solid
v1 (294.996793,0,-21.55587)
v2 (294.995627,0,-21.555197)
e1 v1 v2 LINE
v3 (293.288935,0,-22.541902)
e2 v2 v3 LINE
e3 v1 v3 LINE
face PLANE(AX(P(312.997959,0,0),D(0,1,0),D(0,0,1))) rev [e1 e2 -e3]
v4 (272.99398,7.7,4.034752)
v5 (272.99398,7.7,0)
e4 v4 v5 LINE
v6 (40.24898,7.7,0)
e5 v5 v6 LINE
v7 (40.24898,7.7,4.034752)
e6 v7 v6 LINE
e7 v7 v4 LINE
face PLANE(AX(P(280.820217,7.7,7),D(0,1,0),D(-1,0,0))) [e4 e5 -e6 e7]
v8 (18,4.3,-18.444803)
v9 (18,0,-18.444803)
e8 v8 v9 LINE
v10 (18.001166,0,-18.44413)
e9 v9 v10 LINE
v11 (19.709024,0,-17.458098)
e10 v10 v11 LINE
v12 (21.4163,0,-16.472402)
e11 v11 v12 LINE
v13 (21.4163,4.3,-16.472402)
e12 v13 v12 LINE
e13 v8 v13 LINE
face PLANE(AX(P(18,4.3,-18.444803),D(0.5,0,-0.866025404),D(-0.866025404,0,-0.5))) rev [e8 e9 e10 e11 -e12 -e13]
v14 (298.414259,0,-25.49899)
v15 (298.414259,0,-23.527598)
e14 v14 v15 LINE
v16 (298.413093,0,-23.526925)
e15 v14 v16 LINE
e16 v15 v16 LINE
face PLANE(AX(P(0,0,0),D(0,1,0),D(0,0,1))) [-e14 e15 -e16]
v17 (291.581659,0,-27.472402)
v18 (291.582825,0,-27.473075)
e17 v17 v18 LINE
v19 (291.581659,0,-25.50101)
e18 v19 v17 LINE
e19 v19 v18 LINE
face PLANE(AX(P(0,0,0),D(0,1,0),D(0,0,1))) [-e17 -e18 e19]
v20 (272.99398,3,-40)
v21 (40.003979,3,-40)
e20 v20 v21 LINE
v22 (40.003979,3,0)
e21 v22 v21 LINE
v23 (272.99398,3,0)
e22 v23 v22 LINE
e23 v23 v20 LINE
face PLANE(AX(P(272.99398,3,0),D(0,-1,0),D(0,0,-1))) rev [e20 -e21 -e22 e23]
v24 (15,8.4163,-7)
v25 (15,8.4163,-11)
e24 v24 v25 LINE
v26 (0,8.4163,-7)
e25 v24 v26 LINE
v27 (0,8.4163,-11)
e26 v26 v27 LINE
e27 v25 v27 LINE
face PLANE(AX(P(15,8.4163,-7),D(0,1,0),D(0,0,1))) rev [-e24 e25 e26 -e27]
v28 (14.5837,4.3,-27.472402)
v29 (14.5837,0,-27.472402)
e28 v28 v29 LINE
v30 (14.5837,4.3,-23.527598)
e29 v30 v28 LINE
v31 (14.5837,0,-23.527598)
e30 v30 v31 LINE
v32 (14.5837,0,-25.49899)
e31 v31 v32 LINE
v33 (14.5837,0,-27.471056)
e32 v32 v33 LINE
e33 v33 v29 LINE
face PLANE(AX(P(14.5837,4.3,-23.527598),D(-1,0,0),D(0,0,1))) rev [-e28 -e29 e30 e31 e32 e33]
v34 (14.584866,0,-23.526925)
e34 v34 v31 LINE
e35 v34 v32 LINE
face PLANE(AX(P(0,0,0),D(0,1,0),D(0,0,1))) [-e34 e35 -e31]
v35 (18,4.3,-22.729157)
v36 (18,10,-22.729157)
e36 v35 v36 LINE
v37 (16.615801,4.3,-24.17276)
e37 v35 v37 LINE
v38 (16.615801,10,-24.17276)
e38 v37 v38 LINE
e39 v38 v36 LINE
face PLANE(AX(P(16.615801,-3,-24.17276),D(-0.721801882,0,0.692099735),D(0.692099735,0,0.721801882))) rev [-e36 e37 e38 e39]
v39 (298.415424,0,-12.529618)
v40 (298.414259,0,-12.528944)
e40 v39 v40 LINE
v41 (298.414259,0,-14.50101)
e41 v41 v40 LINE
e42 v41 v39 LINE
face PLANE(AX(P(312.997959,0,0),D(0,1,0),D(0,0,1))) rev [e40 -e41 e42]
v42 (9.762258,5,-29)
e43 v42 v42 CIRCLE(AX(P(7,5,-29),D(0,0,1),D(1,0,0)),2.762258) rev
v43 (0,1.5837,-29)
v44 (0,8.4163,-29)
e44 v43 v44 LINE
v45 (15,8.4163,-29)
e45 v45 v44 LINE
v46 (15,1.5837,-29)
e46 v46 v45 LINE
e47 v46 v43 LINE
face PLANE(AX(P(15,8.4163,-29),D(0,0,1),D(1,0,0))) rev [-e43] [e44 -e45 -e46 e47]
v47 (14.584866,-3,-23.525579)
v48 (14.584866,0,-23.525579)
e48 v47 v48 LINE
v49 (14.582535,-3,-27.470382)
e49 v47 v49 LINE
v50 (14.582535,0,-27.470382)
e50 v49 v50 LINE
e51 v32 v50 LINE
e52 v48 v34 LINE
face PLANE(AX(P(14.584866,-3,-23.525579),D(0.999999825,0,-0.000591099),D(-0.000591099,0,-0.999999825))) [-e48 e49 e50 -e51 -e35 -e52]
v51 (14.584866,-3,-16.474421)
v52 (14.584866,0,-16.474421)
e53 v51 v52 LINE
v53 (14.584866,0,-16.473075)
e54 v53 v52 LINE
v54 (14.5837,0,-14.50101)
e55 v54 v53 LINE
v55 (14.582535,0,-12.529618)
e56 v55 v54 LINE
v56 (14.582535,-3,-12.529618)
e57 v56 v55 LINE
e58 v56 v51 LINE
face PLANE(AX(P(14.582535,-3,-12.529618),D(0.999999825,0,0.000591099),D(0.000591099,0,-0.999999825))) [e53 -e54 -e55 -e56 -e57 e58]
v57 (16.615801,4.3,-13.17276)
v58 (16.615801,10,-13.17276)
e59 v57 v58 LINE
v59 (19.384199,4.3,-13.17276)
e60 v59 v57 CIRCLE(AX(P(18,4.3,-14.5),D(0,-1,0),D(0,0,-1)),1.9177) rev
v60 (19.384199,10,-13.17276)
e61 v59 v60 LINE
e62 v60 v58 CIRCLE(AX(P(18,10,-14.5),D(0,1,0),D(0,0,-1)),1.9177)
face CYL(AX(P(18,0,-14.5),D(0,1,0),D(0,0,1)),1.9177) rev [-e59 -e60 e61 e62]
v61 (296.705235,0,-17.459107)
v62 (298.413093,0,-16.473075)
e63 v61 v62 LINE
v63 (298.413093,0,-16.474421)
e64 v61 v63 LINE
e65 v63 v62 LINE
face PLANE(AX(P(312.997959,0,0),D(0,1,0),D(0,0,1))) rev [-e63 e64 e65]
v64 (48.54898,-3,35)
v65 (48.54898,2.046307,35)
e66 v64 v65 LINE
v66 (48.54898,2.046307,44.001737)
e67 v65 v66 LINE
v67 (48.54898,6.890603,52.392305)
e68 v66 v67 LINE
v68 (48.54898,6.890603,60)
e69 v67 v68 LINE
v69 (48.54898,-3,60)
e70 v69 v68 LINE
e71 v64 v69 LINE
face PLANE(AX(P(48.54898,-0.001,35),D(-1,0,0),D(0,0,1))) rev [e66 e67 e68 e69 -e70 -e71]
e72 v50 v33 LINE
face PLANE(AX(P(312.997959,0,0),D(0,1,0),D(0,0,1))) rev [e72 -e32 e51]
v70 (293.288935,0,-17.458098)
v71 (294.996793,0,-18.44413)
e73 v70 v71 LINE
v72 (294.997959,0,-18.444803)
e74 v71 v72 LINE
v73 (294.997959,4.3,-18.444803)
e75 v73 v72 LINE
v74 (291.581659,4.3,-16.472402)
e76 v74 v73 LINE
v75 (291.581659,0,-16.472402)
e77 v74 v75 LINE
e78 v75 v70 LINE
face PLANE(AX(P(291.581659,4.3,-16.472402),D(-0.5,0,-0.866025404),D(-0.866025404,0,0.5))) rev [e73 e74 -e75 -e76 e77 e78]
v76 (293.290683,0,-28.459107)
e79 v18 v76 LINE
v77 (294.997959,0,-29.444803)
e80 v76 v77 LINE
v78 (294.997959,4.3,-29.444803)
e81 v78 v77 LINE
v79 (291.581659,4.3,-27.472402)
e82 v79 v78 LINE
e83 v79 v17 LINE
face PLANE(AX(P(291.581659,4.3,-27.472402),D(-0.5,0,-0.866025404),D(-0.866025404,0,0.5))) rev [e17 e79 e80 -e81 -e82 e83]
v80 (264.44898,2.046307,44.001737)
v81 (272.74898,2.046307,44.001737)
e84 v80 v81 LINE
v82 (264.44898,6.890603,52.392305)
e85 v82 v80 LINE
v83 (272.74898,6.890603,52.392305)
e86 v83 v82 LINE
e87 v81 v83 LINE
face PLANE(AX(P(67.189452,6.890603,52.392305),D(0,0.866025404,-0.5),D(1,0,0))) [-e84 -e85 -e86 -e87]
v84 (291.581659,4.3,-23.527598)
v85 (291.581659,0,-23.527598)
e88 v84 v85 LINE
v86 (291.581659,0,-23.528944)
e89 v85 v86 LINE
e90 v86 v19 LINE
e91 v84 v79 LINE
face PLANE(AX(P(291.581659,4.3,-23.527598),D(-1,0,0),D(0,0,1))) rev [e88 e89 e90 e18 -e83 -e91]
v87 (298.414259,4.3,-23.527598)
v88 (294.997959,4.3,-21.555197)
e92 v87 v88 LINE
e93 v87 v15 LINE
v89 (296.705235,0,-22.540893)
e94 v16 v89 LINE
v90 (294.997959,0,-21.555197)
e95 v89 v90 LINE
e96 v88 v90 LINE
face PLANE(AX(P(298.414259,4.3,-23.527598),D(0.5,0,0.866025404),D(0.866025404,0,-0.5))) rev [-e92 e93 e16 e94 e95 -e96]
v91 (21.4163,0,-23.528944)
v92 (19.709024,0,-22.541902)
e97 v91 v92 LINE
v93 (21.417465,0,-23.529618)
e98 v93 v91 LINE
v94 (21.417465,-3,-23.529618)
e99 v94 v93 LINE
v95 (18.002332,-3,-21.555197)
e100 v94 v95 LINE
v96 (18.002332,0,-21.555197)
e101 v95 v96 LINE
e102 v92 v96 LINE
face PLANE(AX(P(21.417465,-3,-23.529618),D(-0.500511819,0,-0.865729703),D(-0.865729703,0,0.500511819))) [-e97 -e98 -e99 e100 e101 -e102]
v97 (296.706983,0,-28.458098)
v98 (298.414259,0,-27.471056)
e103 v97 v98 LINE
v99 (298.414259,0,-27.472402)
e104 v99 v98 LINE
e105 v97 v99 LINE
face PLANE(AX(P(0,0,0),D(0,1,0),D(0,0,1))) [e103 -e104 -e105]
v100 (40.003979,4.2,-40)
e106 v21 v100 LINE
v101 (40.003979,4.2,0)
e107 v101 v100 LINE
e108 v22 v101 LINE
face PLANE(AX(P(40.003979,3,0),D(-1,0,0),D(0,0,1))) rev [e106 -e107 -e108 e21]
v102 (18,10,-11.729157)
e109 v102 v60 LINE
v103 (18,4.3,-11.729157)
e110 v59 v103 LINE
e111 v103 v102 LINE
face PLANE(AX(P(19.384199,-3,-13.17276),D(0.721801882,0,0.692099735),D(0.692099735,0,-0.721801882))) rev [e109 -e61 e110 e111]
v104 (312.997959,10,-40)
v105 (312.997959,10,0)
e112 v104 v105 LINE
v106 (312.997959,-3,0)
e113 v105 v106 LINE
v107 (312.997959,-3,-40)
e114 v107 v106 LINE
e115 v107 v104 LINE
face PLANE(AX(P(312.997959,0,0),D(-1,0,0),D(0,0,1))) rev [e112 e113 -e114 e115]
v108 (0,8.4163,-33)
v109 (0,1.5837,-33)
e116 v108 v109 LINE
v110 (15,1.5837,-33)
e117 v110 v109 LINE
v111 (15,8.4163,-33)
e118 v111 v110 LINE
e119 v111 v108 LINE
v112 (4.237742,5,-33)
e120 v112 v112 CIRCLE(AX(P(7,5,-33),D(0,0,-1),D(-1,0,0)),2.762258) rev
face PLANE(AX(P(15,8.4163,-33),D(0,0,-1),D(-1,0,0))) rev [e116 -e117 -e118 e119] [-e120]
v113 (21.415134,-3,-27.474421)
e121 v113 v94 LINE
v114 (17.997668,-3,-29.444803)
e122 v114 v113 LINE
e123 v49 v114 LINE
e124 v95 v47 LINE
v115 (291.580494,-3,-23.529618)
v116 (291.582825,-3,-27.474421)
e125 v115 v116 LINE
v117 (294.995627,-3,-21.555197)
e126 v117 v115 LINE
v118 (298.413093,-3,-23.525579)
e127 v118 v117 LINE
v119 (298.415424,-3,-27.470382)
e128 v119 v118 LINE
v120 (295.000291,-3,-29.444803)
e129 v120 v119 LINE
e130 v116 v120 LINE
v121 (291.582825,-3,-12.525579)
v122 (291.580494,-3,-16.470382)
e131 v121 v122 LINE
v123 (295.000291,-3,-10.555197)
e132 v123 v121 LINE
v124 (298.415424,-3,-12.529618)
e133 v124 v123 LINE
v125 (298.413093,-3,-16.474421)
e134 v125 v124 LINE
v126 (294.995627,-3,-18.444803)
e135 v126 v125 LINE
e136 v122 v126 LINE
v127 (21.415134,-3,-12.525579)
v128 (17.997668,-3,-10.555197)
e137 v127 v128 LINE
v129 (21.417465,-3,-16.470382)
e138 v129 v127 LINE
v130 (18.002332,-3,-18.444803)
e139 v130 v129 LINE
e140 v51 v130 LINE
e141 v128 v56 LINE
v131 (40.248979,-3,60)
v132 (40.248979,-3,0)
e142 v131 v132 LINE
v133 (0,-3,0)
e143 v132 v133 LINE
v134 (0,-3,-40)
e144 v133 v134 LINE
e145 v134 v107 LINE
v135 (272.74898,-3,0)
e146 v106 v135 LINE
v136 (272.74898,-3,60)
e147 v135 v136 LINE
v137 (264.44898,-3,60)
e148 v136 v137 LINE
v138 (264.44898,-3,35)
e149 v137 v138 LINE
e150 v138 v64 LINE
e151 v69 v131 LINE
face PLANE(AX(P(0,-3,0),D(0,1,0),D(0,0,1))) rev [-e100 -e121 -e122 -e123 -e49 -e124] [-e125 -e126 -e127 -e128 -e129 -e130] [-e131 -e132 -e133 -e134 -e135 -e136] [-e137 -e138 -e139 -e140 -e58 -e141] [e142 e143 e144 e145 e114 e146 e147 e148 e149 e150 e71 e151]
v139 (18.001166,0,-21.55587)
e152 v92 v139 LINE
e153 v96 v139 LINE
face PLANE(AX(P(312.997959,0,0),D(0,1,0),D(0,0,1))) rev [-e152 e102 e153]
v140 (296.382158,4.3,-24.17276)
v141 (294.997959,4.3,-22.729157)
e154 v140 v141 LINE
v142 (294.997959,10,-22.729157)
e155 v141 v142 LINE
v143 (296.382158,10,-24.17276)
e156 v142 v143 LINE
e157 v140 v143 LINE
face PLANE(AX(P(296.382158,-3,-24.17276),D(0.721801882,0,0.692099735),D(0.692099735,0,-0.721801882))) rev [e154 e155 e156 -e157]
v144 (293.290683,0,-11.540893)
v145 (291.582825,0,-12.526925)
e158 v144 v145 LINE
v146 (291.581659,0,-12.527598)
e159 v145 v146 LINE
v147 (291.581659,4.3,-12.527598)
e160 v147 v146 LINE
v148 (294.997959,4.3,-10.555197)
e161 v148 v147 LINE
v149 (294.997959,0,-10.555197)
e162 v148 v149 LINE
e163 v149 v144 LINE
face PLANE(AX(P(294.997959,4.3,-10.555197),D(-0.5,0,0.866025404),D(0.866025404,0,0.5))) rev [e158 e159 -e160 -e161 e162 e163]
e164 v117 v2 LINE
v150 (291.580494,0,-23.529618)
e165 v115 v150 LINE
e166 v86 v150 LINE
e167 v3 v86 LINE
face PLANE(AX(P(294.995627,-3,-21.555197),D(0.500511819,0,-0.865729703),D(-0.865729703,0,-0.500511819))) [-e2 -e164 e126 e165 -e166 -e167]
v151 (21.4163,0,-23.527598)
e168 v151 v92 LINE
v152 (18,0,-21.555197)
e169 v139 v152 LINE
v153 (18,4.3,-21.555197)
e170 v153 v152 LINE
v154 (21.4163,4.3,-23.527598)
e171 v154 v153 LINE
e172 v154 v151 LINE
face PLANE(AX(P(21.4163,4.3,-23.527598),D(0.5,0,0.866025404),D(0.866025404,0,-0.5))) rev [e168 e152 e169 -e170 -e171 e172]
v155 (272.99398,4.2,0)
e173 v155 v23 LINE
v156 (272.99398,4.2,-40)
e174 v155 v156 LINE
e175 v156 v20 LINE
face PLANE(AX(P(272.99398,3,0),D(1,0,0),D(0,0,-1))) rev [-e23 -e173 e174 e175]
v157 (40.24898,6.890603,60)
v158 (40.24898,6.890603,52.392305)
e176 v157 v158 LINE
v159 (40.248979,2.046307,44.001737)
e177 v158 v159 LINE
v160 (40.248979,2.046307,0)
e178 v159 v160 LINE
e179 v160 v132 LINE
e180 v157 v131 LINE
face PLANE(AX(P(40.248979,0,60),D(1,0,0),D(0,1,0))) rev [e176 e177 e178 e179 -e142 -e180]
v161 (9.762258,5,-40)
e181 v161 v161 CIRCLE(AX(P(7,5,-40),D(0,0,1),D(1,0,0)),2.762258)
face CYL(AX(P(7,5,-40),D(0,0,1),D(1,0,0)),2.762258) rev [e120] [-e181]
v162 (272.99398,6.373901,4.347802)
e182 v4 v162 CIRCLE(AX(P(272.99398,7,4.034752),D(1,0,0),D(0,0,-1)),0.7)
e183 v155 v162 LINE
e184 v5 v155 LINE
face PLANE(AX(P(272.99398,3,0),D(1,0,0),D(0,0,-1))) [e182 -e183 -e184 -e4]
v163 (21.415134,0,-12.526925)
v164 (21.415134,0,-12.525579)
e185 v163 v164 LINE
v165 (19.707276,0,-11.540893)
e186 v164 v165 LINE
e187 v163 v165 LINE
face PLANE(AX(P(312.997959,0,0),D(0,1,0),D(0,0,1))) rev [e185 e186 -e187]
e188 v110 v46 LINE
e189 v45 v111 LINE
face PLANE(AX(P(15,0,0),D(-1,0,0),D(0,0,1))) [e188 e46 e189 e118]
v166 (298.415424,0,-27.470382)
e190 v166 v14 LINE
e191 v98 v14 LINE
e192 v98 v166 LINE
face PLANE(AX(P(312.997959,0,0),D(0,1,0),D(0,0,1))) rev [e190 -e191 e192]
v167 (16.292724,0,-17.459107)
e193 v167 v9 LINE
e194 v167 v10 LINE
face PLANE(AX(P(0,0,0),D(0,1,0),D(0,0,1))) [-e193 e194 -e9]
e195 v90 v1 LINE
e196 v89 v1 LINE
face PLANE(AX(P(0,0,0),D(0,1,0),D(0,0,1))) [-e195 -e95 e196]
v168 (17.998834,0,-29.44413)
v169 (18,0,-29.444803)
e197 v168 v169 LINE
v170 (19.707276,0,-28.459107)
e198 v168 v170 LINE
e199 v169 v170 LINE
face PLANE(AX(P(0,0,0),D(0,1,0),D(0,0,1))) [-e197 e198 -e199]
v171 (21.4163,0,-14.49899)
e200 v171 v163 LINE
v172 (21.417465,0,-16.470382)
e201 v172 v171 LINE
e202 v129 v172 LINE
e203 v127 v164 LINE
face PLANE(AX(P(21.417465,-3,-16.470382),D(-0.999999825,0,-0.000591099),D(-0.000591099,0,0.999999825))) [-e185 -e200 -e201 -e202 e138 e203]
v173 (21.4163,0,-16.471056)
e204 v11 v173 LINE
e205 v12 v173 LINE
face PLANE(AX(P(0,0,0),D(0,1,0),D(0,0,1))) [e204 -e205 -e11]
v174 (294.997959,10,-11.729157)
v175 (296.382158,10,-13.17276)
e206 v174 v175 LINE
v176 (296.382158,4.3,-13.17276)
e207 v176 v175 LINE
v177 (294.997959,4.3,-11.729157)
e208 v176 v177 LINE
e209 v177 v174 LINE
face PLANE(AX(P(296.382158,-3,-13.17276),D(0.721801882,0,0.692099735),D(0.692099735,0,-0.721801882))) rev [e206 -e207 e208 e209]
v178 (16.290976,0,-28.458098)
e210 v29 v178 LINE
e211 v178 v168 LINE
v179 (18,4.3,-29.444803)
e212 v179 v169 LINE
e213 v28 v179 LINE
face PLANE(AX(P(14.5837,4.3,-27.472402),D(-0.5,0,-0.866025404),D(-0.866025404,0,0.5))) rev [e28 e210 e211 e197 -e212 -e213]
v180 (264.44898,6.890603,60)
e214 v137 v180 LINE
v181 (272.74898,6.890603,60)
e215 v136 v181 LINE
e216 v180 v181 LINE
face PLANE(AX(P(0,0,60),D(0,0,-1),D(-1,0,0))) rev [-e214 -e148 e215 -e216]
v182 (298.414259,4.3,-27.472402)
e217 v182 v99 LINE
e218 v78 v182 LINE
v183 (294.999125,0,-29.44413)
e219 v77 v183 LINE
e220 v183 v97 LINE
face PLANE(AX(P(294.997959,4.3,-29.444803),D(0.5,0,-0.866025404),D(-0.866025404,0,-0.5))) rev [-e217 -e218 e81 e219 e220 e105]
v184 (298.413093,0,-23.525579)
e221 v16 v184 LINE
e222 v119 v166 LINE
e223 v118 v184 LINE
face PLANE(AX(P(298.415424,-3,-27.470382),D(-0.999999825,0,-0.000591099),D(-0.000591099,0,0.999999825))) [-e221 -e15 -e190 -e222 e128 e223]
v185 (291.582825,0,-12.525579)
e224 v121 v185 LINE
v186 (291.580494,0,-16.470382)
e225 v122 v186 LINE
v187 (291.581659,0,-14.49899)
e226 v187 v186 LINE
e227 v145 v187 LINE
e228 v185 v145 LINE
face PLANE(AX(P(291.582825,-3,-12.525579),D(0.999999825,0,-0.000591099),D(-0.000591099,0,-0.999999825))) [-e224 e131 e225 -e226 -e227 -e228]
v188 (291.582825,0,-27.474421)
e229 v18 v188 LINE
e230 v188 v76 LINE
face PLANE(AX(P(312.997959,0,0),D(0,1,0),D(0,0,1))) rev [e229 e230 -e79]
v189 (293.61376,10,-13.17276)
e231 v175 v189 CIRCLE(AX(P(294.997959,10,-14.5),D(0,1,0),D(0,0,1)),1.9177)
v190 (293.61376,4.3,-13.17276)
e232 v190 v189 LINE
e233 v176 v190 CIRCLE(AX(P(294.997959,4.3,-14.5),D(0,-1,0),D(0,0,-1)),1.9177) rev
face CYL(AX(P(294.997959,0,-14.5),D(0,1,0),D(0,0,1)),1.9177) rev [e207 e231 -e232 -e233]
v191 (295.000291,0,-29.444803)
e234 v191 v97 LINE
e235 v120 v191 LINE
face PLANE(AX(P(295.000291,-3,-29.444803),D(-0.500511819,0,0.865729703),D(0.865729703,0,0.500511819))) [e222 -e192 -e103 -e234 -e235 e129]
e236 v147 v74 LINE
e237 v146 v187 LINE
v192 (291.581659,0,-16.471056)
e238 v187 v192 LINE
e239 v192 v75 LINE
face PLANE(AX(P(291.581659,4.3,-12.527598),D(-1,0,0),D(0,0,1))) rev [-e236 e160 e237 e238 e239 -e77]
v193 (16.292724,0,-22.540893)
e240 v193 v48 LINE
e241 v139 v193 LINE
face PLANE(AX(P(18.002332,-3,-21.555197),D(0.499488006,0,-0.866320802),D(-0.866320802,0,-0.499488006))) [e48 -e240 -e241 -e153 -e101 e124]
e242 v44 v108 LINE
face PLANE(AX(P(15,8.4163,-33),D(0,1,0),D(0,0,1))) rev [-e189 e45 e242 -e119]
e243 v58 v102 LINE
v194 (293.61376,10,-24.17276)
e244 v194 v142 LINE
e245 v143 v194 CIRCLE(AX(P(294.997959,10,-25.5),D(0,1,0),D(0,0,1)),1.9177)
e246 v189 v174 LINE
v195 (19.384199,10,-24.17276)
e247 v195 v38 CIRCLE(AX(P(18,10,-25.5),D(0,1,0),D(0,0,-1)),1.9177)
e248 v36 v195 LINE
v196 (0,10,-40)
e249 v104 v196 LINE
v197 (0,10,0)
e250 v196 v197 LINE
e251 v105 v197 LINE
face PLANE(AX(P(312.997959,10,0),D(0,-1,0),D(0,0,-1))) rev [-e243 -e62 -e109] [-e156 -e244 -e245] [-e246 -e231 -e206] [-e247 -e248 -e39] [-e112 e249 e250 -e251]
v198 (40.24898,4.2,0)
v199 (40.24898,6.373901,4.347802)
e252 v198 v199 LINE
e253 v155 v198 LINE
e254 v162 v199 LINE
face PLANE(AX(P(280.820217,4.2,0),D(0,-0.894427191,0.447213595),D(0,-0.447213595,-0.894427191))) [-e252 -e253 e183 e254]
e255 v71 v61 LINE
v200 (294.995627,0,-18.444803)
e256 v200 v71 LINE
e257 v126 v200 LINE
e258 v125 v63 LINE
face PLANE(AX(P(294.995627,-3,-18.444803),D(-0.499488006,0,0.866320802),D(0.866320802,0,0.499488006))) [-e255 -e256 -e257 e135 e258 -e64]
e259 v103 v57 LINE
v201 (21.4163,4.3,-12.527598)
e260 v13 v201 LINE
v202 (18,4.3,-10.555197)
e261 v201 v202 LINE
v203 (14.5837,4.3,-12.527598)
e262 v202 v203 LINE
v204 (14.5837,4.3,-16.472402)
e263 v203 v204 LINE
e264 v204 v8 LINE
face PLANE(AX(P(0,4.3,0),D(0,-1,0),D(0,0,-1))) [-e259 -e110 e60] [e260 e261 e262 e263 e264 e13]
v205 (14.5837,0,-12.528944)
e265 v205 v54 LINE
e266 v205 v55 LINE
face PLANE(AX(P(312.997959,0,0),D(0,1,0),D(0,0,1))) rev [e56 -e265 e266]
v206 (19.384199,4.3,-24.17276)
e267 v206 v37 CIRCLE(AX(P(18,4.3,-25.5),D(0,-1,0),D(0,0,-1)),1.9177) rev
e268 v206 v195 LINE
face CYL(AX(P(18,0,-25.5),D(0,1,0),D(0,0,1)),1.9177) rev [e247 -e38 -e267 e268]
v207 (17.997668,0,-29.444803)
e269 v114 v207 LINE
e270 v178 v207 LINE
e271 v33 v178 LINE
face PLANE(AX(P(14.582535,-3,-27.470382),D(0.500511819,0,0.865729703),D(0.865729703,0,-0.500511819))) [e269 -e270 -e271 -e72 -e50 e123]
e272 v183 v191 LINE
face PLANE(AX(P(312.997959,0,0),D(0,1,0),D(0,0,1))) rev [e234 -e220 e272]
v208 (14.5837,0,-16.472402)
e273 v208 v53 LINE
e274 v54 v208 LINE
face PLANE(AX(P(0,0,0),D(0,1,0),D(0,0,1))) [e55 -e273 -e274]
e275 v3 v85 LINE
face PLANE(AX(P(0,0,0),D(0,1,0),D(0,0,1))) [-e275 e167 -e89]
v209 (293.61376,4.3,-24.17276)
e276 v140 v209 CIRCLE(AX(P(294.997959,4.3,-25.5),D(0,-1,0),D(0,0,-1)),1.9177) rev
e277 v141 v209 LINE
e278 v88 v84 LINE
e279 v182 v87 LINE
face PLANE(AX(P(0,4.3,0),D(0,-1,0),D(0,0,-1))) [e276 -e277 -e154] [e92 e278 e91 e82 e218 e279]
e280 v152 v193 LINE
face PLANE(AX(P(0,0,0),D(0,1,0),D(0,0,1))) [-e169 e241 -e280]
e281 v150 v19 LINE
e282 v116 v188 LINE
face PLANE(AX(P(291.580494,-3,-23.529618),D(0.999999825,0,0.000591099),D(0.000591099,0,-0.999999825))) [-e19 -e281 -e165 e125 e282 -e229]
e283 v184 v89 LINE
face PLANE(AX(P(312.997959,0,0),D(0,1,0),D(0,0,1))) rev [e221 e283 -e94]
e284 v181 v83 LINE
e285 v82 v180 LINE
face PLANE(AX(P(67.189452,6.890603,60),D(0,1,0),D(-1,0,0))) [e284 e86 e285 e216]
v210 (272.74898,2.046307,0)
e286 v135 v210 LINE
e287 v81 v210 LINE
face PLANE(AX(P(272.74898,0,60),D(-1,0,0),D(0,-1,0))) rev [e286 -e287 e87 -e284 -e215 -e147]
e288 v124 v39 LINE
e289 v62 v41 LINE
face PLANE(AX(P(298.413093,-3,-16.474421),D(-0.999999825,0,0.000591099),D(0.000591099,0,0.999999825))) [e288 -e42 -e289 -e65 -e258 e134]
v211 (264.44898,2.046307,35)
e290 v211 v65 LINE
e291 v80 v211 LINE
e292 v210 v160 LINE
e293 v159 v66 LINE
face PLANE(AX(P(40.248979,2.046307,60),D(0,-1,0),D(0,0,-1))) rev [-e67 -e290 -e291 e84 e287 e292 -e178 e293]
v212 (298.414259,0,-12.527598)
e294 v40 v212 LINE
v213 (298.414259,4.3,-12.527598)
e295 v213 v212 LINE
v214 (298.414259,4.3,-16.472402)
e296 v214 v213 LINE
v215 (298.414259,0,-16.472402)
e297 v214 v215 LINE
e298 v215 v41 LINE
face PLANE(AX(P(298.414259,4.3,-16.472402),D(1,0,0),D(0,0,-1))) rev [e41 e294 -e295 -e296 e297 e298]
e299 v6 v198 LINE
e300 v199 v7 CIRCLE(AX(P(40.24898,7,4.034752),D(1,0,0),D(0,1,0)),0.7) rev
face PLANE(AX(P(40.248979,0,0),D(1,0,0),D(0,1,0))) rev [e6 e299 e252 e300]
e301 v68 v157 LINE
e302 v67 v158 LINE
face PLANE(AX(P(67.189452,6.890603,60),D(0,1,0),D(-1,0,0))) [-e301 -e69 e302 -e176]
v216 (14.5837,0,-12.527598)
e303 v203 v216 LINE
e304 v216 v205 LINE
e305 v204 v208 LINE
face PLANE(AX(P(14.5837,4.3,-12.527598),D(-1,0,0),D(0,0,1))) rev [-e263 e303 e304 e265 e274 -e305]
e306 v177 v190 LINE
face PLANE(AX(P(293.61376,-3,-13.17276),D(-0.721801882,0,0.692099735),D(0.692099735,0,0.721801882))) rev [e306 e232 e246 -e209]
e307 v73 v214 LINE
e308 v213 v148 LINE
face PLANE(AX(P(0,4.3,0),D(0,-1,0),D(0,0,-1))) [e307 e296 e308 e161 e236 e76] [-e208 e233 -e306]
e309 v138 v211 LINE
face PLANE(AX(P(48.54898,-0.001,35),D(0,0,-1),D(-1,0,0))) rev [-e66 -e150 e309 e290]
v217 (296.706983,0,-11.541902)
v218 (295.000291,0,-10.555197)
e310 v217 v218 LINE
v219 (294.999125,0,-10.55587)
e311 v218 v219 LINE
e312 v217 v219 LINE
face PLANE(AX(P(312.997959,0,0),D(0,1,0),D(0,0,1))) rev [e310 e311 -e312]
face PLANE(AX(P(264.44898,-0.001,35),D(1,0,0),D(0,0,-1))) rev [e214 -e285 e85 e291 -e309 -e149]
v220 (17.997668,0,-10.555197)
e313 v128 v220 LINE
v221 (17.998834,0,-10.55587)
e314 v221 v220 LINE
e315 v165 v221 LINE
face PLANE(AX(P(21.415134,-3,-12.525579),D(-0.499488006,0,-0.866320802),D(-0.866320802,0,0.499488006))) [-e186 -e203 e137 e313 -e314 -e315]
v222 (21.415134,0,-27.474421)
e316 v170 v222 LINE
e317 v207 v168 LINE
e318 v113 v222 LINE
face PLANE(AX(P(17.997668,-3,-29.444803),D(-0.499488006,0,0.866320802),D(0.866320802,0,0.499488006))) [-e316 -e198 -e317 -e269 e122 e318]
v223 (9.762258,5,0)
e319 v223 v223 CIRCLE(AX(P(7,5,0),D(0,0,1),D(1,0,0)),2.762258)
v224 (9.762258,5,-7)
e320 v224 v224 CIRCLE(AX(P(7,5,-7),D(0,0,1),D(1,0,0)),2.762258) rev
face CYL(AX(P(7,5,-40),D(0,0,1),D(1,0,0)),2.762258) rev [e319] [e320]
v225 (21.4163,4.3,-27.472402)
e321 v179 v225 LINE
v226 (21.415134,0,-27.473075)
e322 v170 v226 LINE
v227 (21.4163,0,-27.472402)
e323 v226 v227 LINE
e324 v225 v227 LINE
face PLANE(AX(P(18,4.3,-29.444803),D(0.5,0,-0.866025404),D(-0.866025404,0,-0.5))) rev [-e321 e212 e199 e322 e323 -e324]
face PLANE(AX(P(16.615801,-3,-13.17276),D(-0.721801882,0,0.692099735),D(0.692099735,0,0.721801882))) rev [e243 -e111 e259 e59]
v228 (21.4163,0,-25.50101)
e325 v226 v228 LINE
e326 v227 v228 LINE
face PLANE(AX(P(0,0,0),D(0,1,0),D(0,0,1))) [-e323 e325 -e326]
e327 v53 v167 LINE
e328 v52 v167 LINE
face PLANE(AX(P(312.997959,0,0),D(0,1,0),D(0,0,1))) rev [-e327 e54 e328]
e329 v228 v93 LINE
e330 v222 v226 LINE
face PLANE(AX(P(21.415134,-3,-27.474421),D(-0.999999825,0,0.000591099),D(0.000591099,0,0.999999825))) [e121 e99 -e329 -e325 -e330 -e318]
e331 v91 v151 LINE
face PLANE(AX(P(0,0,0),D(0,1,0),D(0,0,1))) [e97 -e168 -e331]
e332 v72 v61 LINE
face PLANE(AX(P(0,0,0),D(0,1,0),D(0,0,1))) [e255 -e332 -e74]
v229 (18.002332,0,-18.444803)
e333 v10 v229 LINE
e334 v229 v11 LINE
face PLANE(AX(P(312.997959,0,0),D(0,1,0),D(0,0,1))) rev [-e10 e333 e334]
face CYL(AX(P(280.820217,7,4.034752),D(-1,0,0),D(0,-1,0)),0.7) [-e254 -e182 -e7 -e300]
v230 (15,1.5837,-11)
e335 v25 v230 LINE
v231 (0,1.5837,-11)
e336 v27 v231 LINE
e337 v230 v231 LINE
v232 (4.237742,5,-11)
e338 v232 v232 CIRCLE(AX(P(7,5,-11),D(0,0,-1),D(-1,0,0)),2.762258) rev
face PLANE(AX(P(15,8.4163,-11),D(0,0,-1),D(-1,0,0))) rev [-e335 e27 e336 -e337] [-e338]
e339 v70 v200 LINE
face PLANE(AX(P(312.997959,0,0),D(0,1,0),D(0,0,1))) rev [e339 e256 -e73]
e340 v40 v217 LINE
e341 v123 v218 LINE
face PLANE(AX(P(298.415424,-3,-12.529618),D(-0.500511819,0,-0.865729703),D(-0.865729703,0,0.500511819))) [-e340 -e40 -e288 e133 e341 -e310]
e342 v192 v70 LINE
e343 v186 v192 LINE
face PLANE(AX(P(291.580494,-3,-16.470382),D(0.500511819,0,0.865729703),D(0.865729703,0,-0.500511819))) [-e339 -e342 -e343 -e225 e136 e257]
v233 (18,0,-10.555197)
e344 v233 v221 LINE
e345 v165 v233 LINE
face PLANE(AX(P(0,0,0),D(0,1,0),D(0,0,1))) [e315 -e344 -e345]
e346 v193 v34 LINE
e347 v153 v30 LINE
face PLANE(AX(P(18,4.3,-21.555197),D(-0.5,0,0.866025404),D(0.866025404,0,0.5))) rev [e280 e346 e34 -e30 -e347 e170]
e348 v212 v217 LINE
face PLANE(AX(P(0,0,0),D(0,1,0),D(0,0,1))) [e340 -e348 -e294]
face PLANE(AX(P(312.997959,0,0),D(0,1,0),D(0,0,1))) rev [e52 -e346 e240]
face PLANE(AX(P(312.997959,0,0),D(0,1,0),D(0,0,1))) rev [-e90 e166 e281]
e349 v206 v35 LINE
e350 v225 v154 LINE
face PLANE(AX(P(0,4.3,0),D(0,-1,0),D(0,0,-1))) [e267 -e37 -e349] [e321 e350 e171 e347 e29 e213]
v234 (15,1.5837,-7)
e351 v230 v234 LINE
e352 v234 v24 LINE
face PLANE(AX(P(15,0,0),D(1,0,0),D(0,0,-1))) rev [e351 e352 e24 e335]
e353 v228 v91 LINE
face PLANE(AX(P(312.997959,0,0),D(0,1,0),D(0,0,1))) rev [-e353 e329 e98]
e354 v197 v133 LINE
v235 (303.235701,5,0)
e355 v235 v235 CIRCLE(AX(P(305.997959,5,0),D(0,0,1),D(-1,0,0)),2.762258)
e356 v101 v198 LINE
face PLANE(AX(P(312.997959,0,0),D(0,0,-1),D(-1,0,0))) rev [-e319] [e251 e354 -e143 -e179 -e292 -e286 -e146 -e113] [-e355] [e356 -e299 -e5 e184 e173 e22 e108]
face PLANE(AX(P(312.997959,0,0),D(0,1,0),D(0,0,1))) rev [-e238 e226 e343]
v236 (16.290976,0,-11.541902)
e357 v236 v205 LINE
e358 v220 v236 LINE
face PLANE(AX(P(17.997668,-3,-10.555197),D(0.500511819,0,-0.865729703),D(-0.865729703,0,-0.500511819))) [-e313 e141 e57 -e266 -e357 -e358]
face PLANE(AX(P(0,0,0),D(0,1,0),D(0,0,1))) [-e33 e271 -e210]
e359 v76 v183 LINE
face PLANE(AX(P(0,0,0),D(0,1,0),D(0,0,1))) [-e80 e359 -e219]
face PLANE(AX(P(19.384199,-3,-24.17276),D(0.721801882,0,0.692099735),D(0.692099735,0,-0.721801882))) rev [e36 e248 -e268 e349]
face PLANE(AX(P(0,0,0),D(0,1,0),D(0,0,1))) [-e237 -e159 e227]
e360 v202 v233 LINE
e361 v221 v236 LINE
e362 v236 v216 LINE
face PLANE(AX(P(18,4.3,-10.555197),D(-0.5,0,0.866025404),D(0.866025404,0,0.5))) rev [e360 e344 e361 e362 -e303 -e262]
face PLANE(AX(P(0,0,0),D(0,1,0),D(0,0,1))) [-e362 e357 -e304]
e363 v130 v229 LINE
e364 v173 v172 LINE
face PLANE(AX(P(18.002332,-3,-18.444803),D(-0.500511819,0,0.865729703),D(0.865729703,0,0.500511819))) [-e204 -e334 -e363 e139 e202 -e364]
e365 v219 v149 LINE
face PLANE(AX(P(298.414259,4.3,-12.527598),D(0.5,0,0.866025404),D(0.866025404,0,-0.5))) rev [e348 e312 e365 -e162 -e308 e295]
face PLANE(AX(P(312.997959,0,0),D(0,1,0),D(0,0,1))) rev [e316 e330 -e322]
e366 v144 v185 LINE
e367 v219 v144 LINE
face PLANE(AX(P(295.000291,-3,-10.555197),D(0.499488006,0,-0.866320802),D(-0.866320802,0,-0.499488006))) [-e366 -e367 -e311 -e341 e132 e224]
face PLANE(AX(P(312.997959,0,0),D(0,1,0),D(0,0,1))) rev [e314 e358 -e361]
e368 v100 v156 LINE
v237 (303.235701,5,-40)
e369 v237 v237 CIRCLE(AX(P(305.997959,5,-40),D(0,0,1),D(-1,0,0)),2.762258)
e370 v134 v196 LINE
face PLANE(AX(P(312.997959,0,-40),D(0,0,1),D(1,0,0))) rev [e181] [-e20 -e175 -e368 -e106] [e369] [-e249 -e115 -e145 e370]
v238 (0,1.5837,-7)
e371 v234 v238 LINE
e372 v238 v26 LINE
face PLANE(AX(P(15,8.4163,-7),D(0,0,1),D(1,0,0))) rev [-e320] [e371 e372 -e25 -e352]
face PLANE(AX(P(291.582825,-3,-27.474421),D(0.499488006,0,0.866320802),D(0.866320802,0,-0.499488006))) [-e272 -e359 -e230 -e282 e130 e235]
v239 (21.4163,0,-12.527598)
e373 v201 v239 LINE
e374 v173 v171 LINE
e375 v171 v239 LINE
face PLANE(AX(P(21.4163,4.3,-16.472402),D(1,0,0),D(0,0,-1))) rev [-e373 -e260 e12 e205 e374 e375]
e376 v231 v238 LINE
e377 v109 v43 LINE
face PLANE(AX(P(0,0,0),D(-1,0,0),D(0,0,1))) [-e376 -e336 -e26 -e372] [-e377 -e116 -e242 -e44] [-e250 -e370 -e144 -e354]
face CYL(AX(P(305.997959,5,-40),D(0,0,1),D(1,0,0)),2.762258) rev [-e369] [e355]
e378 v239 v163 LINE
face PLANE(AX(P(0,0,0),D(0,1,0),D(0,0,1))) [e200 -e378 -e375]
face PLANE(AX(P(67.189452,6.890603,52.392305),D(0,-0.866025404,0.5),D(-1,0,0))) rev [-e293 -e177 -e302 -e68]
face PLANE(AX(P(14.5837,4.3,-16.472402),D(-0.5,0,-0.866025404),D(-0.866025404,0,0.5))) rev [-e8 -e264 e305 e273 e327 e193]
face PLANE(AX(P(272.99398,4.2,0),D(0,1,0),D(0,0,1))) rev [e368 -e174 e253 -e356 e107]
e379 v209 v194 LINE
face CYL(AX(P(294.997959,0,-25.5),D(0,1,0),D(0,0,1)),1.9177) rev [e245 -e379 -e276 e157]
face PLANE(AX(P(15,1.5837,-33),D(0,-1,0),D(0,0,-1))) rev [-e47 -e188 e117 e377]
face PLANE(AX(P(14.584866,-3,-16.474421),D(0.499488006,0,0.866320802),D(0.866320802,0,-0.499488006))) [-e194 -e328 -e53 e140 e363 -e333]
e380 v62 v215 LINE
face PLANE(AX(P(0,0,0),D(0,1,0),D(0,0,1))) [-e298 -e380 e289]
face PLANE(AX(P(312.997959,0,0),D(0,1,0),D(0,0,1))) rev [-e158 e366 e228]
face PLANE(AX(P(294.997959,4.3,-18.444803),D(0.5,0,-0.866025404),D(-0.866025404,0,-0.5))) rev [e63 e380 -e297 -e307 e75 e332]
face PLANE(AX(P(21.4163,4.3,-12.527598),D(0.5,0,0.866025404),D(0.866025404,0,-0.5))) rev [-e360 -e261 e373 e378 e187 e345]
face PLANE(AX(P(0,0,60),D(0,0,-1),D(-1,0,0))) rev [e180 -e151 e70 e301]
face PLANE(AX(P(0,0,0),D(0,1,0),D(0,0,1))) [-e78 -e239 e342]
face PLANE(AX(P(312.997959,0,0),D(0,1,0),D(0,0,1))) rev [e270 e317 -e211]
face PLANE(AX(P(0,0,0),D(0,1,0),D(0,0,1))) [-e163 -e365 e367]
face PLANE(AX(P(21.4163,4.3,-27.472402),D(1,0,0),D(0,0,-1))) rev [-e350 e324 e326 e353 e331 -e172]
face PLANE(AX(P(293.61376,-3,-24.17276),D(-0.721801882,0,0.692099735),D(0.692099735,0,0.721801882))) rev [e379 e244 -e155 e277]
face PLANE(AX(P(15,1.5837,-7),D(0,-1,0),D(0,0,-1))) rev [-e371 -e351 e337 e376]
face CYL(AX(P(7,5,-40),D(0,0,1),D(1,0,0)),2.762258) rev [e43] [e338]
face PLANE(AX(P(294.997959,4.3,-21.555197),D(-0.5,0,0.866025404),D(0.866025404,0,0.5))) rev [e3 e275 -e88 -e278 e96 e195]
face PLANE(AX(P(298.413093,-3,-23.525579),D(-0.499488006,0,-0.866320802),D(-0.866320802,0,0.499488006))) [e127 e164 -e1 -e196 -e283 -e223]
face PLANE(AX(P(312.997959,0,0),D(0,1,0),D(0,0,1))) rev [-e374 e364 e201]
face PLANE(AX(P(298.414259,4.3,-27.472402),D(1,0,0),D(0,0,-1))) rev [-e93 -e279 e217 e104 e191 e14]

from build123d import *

# Parameters (mm, degrees)
SKETCH1_W           = 40
SKETCH1_H           = 10
BOSS_EXTRUDE1_DEPTH = 312.997959
SKETCH2_W           = 232.99
SKETCH2_H           = 1.2
CUT_EXTRUDE1_DEPTH  = 316.701951749
SKETCH3_R           = 1.9177
CUT_EXTRUDE2_DEPTH  = 316.701951749
CUT_EXTRUDE3_DEPTH  = 4.3
SKETCH5_R           = 2.762258299
CUT_EXTRUDE4_DEPTH  = 316.701951749
SKETCH6_W           = 4
SKETCH6_H           = 6.8326
CUT_EXTRUDE5_DEPTH  = 15
SKETCH7_W           = 232.5
SKETCH7_H           = 2.046306953
BOSS_EXTRUDE2_DEPTH = 60
CUT_EXTRUDE6_REACH  = 320.796
SKETCH8_W           = 215.9
SKETCH8_H           = 25
BOSS_EXTRUDE3_DEPTH = 3
SKETCH10_W          = 18
SKETCH10_H          = 4.844296322
BOSS_EXTRUDE4_DEPTH = 8.3
BOSS_EXTRUDE6_DEPTH = 232.745
FILLET1_R           = 0.7
SKETCH15_W          = 8.3
SKETCH15_H          = 18
BOSS_EXTRUDE8_DEPTH = 4.844296322
CUT_EXTRUDE8_DEPTH  = 319.961944969
CHAMFER1_SIZE       = 10.392304845
CHAMFER1_SIZE_2     = 6


with BuildPart() as part:
    # Sketch1 → Boss-Extrude1 (new body)
    with BuildSketch(Plane(origin=(0, 0, 0), x_dir=(0, 0, -1), z_dir=(1, 0, 0))):
        with Locations((20, 5)):
            Rectangle(SKETCH1_W, SKETCH1_H)
    extrude(amount=BOSS_EXTRUDE1_DEPTH)

    # Sketch2 → Cut-Extrude1 (cut, through all)
    with BuildSketch(Plane(origin=(0, 0, -40), x_dir=(-1, 0, 0), z_dir=(0, 0, -1))):
        with Locations((-156.4989795, 3.6)):
            Rectangle(SKETCH2_W, SKETCH2_H)
    extrude(amount=-CUT_EXTRUDE1_DEPTH, mode=Mode.SUBTRACT)

    # Sketch3 → Cut-Extrude2 (cut, through all)
    with BuildSketch(Plane(origin=(0, 10, 0), x_dir=(1, 0, 0), z_dir=(0, 1, 0))):
        with Locations(Location((294.997959, 25.5, 0), (0, 0, 270))):
            Circle(SKETCH3_R)
        with Locations(Location((294.997959, 14.5, 0), (0, 0, 270))):
            Circle(SKETCH3_R)
        with Locations(Location((18, 14.5, 0), (0, 0, 90))):
            Circle(SKETCH3_R)
        with Locations(Location((18, 25.5, 0), (0, 0, 90))):
            Circle(SKETCH3_R)
    extrude(amount=-CUT_EXTRUDE2_DEPTH, mode=Mode.SUBTRACT)

    # Sketch4 → Cut-Extrude3 (cut)
    with BuildSketch(Plane.XZ):
        Polygon((14.5837, -12.527598275), (14.5837, -16.472401725), (18, -18.444803449), (21.4163, -16.472401725), (21.4163, -12.527598275), (18, -10.555196551), align=None)
        Polygon((14.5837, -23.527598275), (14.5837, -27.472401725), (18, -29.444803449), (21.4163, -27.472401725), (21.4163, -23.527598275), (18, -21.555196551), align=None)
        Polygon((298.414259, -12.527598275), (294.997959, -10.555196551), (291.581659, -12.527598275), (291.581659, -16.472401725), (294.997959, -18.444803449), (298.414259, -16.472401725), align=None)
        Polygon((291.581659, -23.527598275), (291.581659, -27.472401725), (294.997959, -29.444803449), (298.414259, -27.472401725), (298.414259, -23.527598275), (294.997959, -21.555196551), align=None)
    extrude(amount=-CUT_EXTRUDE3_DEPTH, mode=Mode.SUBTRACT)

    # Sketch5 → Cut-Extrude4 (cut, through all)
    with BuildSketch(Plane.XY):
        with Locations((7, 5)):
            Circle(SKETCH5_R)
        with Locations(Location((305.997959, 5, 0), (0, 0, 180))):
            Circle(SKETCH5_R)
    extrude(amount=-CUT_EXTRUDE4_DEPTH, mode=Mode.SUBTRACT)

    # Sketch6 → Cut-Extrude5 (cut)
    with BuildSketch(Plane.ZY):
        with Locations((-31, 5)):
            Rectangle(SKETCH6_W, SKETCH6_H)
        with Locations((-9, 5)):
            Rectangle(SKETCH6_W, SKETCH6_H)
    extrude(amount=-CUT_EXTRUDE5_DEPTH, mode=Mode.SUBTRACT)

    # Sketch7 → Boss-Extrude2 (add)
    with BuildSketch(Plane.XY):
        with Locations((156.4989795, 1.023153477)):
            Rectangle(SKETCH7_W, SKETCH7_H)
    extrude(amount=BOSS_EXTRUDE2_DEPTH)

    # Sketch8 → Cut-Extrude6 (cut, up to next)
    with BuildSketch(Plane(origin=(0, 2.046306953, 0), x_dir=(1, 0, 0), z_dir=(0, 1, 0)), mode=Mode.PRIVATE) as cut_extrude6_sk1:
        with Locations((156.4989795, -47.5)):
            Rectangle(SKETCH8_W, SKETCH8_H)
    cut_extrude6_tool1 = extrude(cut_extrude6_sk1.sketch, amount=-CUT_EXTRUDE6_REACH, mode=Mode.PRIVATE) & part.part
    add(cut_extrude6_tool1.solids().sort_by_distance((156.49898, 2.046307, 47.5))[0], mode=Mode.SUBTRACT)

    # Sketch9 → Boss-Extrude3 (add)
    with BuildSketch(Plane.XZ):
        Polygon((0, -40), (0, 0), (40.2489795, 0), (40.2489795, 60), (48.5489795, 60), (48.5489795, 35), (264.4489795, 35), (264.4489795, 60), (272.7489795, 60), (272.7489795, 0), (312.997959, 0), (312.997959, -40), align=None)
        Polygon((17.997668231, -10.55519724), (14.582534712, -12.529617991), (14.584866481, -16.474420751), (18.002331769, -18.44480276), (21.417465288, -16.470382009), (21.415133519, -12.525579249), align=None, mode=Mode.SUBTRACT)
        Polygon((18.002331769, -21.55519724), (14.584866481, -23.525579249), (14.582534712, -27.470382009), (17.997668231, -29.44480276), (21.415133519, -27.474420751), (21.417465288, -23.529617991), align=None, mode=Mode.SUBTRACT)
        Polygon((295.000290769, -10.55519724), (291.582825481, -12.525579249), (291.580493712, -16.470382009), (294.995627231, -18.44480276), (298.413092519, -16.474420751), (298.415424288, -12.529617991), align=None, mode=Mode.SUBTRACT)
        Polygon((294.995627231, -21.55519724), (291.580493712, -23.529617991), (291.582825481, -27.474420751), (295.000290769, -29.44480276), (298.415424288, -27.470382009), (298.413092519, -23.525579249), align=None, mode=Mode.SUBTRACT)
    extrude(amount=BOSS_EXTRUDE3_DEPTH)

    # Sketch10 → Boss-Extrude4 (add)
    with BuildSketch(Plane.ZY.offset(-40.2489795)):
        with Locations((51, 4.468455114)):
            Rectangle(SKETCH10_W, SKETCH10_H)
    extrude(amount=-BOSS_EXTRUDE4_DEPTH)

    # Sketch12 → Boss-Extrude6 (add)
    with BuildSketch(Plane.ZY.offset(-40.2489795)):
        Polygon((0, 4.2), (7, 7.7), (0, 7.7), align=None)
    extrude(amount=-BOSS_EXTRUDE6_DEPTH)

    # Fillet1
    fillet1_edges = [part.edges().sort_by_distance(p)[0] for p in [
        (156.6214795, 7.7, 7),
    ]]
    fillet(fillet1_edges, radius=FILLET1_R)

    # Sketch15 → Boss-Extrude8 (add)
    with BuildSketch(Plane(origin=(0, 2.046306953, 0), x_dir=(1, 0, 0), z_dir=(0, 1, 0))):
        with Locations((268.5989795, -51)):
            Rectangle(SKETCH15_W, SKETCH15_H)
    extrude(amount=BOSS_EXTRUDE8_DEPTH)

    # Sketch16 → Cut-Extrude8 (cut, through all)
    with BuildSketch(Plane(origin=(0, 10, 0), x_dir=(1, 0, 0), z_dir=(0, 1, 0))):
        with BuildLine():
            Line((16.61580053, 24.172760339), (18, 22.729156574))
            Line((18, 22.729156574), (19.38419947, 24.172760339))
            ThreePointArc((19.38419947, 24.172760339), (18, 23.5823), (16.61580053, 24.172760339))
        make_face()
        with BuildLine():
            Line((16.61580053, 13.172760339), (18, 11.729156574))
            Line((18, 11.729156574), (19.38419947, 13.172760339))
            ThreePointArc((19.38419947, 13.172760339), (18, 12.5823), (16.61580053, 13.172760339))
        make_face()
        with BuildLine():
            Line((293.61375953, 13.172760339), (294.997959, 11.729156574))
            Line((294.997959, 11.729156574), (296.38215847, 13.172760339))
            ThreePointArc((296.38215847, 13.172760339), (294.997959, 12.5823), (293.61375953, 13.172760339))
        make_face()
        with BuildLine():
            Line((293.61375953, 24.172760339), (294.997959, 22.729156574))
            Line((294.997959, 22.729156574), (296.38215847, 24.172760339))
            ThreePointArc((296.38215847, 24.172760339), (294.997959, 23.5823), (293.61375953, 24.172760339))
        make_face()
    extrude(amount=-CUT_EXTRUDE8_DEPTH, mode=Mode.SUBTRACT)

    # Chamfer1
    # the kernel refuses this chamfer: 10.392304845, 6 mm, written as the material it takes off along each edge
    with BuildSketch(Plane(origin=(13.363195676, 6.890603275, 42), x_dir=(0, 0.019326765612700778, 0.9998132206222079), z_dir=(1, 0, 0))) as chamfer1_piece_1_section:
        Polygon((CHAMFER1_SIZE * 0.999813220662, CHAMFER1_SIZE * 0.0193267656135), (-CHAMFER1_SIZE_2 * 0.0193267656127, CHAMFER1_SIZE_2 * 0.999813220622), (0, 0), align=None)
    chamfer1_piece_1 = extrude(amount=62.071567647, mode=Mode.PRIVATE)
    chamfer1_piece_1 = split(chamfer1_piece_1, bisect_by=Plane(origin=(44.3989795, 2.046306953, 45.647661679), z_dir=(0, 1, 0)), keep=Keep.TOP, mode=Mode.PRIVATE)
    add(chamfer1_piece_1, mode=Mode.SUBTRACT)
    with BuildSketch(Plane(origin=(237.563195676, 6.890603275, 42), x_dir=(0, 0.019326765612700615, 0.9998132206222079), z_dir=(1, 0, 0))) as chamfer1_piece_2_section:
        Polygon((CHAMFER1_SIZE * 0.999813220662, CHAMFER1_SIZE * 0.0193267656135), (-CHAMFER1_SIZE_2 * 0.0193267656127, CHAMFER1_SIZE_2 * 0.999813220622), (0, 0), align=None)
    chamfer1_piece_2 = extrude(amount=62.071567647, mode=Mode.PRIVATE)
    chamfer1_piece_2 = split(chamfer1_piece_2, bisect_by=Plane(origin=(268.5989795, 2.046306953, 45.647661679), z_dir=(0, 1, 0)), keep=Keep.TOP, mode=Mode.PRIVATE)
    add(chamfer1_piece_2, mode=Mode.SUBTRACT)


solid = part.part
